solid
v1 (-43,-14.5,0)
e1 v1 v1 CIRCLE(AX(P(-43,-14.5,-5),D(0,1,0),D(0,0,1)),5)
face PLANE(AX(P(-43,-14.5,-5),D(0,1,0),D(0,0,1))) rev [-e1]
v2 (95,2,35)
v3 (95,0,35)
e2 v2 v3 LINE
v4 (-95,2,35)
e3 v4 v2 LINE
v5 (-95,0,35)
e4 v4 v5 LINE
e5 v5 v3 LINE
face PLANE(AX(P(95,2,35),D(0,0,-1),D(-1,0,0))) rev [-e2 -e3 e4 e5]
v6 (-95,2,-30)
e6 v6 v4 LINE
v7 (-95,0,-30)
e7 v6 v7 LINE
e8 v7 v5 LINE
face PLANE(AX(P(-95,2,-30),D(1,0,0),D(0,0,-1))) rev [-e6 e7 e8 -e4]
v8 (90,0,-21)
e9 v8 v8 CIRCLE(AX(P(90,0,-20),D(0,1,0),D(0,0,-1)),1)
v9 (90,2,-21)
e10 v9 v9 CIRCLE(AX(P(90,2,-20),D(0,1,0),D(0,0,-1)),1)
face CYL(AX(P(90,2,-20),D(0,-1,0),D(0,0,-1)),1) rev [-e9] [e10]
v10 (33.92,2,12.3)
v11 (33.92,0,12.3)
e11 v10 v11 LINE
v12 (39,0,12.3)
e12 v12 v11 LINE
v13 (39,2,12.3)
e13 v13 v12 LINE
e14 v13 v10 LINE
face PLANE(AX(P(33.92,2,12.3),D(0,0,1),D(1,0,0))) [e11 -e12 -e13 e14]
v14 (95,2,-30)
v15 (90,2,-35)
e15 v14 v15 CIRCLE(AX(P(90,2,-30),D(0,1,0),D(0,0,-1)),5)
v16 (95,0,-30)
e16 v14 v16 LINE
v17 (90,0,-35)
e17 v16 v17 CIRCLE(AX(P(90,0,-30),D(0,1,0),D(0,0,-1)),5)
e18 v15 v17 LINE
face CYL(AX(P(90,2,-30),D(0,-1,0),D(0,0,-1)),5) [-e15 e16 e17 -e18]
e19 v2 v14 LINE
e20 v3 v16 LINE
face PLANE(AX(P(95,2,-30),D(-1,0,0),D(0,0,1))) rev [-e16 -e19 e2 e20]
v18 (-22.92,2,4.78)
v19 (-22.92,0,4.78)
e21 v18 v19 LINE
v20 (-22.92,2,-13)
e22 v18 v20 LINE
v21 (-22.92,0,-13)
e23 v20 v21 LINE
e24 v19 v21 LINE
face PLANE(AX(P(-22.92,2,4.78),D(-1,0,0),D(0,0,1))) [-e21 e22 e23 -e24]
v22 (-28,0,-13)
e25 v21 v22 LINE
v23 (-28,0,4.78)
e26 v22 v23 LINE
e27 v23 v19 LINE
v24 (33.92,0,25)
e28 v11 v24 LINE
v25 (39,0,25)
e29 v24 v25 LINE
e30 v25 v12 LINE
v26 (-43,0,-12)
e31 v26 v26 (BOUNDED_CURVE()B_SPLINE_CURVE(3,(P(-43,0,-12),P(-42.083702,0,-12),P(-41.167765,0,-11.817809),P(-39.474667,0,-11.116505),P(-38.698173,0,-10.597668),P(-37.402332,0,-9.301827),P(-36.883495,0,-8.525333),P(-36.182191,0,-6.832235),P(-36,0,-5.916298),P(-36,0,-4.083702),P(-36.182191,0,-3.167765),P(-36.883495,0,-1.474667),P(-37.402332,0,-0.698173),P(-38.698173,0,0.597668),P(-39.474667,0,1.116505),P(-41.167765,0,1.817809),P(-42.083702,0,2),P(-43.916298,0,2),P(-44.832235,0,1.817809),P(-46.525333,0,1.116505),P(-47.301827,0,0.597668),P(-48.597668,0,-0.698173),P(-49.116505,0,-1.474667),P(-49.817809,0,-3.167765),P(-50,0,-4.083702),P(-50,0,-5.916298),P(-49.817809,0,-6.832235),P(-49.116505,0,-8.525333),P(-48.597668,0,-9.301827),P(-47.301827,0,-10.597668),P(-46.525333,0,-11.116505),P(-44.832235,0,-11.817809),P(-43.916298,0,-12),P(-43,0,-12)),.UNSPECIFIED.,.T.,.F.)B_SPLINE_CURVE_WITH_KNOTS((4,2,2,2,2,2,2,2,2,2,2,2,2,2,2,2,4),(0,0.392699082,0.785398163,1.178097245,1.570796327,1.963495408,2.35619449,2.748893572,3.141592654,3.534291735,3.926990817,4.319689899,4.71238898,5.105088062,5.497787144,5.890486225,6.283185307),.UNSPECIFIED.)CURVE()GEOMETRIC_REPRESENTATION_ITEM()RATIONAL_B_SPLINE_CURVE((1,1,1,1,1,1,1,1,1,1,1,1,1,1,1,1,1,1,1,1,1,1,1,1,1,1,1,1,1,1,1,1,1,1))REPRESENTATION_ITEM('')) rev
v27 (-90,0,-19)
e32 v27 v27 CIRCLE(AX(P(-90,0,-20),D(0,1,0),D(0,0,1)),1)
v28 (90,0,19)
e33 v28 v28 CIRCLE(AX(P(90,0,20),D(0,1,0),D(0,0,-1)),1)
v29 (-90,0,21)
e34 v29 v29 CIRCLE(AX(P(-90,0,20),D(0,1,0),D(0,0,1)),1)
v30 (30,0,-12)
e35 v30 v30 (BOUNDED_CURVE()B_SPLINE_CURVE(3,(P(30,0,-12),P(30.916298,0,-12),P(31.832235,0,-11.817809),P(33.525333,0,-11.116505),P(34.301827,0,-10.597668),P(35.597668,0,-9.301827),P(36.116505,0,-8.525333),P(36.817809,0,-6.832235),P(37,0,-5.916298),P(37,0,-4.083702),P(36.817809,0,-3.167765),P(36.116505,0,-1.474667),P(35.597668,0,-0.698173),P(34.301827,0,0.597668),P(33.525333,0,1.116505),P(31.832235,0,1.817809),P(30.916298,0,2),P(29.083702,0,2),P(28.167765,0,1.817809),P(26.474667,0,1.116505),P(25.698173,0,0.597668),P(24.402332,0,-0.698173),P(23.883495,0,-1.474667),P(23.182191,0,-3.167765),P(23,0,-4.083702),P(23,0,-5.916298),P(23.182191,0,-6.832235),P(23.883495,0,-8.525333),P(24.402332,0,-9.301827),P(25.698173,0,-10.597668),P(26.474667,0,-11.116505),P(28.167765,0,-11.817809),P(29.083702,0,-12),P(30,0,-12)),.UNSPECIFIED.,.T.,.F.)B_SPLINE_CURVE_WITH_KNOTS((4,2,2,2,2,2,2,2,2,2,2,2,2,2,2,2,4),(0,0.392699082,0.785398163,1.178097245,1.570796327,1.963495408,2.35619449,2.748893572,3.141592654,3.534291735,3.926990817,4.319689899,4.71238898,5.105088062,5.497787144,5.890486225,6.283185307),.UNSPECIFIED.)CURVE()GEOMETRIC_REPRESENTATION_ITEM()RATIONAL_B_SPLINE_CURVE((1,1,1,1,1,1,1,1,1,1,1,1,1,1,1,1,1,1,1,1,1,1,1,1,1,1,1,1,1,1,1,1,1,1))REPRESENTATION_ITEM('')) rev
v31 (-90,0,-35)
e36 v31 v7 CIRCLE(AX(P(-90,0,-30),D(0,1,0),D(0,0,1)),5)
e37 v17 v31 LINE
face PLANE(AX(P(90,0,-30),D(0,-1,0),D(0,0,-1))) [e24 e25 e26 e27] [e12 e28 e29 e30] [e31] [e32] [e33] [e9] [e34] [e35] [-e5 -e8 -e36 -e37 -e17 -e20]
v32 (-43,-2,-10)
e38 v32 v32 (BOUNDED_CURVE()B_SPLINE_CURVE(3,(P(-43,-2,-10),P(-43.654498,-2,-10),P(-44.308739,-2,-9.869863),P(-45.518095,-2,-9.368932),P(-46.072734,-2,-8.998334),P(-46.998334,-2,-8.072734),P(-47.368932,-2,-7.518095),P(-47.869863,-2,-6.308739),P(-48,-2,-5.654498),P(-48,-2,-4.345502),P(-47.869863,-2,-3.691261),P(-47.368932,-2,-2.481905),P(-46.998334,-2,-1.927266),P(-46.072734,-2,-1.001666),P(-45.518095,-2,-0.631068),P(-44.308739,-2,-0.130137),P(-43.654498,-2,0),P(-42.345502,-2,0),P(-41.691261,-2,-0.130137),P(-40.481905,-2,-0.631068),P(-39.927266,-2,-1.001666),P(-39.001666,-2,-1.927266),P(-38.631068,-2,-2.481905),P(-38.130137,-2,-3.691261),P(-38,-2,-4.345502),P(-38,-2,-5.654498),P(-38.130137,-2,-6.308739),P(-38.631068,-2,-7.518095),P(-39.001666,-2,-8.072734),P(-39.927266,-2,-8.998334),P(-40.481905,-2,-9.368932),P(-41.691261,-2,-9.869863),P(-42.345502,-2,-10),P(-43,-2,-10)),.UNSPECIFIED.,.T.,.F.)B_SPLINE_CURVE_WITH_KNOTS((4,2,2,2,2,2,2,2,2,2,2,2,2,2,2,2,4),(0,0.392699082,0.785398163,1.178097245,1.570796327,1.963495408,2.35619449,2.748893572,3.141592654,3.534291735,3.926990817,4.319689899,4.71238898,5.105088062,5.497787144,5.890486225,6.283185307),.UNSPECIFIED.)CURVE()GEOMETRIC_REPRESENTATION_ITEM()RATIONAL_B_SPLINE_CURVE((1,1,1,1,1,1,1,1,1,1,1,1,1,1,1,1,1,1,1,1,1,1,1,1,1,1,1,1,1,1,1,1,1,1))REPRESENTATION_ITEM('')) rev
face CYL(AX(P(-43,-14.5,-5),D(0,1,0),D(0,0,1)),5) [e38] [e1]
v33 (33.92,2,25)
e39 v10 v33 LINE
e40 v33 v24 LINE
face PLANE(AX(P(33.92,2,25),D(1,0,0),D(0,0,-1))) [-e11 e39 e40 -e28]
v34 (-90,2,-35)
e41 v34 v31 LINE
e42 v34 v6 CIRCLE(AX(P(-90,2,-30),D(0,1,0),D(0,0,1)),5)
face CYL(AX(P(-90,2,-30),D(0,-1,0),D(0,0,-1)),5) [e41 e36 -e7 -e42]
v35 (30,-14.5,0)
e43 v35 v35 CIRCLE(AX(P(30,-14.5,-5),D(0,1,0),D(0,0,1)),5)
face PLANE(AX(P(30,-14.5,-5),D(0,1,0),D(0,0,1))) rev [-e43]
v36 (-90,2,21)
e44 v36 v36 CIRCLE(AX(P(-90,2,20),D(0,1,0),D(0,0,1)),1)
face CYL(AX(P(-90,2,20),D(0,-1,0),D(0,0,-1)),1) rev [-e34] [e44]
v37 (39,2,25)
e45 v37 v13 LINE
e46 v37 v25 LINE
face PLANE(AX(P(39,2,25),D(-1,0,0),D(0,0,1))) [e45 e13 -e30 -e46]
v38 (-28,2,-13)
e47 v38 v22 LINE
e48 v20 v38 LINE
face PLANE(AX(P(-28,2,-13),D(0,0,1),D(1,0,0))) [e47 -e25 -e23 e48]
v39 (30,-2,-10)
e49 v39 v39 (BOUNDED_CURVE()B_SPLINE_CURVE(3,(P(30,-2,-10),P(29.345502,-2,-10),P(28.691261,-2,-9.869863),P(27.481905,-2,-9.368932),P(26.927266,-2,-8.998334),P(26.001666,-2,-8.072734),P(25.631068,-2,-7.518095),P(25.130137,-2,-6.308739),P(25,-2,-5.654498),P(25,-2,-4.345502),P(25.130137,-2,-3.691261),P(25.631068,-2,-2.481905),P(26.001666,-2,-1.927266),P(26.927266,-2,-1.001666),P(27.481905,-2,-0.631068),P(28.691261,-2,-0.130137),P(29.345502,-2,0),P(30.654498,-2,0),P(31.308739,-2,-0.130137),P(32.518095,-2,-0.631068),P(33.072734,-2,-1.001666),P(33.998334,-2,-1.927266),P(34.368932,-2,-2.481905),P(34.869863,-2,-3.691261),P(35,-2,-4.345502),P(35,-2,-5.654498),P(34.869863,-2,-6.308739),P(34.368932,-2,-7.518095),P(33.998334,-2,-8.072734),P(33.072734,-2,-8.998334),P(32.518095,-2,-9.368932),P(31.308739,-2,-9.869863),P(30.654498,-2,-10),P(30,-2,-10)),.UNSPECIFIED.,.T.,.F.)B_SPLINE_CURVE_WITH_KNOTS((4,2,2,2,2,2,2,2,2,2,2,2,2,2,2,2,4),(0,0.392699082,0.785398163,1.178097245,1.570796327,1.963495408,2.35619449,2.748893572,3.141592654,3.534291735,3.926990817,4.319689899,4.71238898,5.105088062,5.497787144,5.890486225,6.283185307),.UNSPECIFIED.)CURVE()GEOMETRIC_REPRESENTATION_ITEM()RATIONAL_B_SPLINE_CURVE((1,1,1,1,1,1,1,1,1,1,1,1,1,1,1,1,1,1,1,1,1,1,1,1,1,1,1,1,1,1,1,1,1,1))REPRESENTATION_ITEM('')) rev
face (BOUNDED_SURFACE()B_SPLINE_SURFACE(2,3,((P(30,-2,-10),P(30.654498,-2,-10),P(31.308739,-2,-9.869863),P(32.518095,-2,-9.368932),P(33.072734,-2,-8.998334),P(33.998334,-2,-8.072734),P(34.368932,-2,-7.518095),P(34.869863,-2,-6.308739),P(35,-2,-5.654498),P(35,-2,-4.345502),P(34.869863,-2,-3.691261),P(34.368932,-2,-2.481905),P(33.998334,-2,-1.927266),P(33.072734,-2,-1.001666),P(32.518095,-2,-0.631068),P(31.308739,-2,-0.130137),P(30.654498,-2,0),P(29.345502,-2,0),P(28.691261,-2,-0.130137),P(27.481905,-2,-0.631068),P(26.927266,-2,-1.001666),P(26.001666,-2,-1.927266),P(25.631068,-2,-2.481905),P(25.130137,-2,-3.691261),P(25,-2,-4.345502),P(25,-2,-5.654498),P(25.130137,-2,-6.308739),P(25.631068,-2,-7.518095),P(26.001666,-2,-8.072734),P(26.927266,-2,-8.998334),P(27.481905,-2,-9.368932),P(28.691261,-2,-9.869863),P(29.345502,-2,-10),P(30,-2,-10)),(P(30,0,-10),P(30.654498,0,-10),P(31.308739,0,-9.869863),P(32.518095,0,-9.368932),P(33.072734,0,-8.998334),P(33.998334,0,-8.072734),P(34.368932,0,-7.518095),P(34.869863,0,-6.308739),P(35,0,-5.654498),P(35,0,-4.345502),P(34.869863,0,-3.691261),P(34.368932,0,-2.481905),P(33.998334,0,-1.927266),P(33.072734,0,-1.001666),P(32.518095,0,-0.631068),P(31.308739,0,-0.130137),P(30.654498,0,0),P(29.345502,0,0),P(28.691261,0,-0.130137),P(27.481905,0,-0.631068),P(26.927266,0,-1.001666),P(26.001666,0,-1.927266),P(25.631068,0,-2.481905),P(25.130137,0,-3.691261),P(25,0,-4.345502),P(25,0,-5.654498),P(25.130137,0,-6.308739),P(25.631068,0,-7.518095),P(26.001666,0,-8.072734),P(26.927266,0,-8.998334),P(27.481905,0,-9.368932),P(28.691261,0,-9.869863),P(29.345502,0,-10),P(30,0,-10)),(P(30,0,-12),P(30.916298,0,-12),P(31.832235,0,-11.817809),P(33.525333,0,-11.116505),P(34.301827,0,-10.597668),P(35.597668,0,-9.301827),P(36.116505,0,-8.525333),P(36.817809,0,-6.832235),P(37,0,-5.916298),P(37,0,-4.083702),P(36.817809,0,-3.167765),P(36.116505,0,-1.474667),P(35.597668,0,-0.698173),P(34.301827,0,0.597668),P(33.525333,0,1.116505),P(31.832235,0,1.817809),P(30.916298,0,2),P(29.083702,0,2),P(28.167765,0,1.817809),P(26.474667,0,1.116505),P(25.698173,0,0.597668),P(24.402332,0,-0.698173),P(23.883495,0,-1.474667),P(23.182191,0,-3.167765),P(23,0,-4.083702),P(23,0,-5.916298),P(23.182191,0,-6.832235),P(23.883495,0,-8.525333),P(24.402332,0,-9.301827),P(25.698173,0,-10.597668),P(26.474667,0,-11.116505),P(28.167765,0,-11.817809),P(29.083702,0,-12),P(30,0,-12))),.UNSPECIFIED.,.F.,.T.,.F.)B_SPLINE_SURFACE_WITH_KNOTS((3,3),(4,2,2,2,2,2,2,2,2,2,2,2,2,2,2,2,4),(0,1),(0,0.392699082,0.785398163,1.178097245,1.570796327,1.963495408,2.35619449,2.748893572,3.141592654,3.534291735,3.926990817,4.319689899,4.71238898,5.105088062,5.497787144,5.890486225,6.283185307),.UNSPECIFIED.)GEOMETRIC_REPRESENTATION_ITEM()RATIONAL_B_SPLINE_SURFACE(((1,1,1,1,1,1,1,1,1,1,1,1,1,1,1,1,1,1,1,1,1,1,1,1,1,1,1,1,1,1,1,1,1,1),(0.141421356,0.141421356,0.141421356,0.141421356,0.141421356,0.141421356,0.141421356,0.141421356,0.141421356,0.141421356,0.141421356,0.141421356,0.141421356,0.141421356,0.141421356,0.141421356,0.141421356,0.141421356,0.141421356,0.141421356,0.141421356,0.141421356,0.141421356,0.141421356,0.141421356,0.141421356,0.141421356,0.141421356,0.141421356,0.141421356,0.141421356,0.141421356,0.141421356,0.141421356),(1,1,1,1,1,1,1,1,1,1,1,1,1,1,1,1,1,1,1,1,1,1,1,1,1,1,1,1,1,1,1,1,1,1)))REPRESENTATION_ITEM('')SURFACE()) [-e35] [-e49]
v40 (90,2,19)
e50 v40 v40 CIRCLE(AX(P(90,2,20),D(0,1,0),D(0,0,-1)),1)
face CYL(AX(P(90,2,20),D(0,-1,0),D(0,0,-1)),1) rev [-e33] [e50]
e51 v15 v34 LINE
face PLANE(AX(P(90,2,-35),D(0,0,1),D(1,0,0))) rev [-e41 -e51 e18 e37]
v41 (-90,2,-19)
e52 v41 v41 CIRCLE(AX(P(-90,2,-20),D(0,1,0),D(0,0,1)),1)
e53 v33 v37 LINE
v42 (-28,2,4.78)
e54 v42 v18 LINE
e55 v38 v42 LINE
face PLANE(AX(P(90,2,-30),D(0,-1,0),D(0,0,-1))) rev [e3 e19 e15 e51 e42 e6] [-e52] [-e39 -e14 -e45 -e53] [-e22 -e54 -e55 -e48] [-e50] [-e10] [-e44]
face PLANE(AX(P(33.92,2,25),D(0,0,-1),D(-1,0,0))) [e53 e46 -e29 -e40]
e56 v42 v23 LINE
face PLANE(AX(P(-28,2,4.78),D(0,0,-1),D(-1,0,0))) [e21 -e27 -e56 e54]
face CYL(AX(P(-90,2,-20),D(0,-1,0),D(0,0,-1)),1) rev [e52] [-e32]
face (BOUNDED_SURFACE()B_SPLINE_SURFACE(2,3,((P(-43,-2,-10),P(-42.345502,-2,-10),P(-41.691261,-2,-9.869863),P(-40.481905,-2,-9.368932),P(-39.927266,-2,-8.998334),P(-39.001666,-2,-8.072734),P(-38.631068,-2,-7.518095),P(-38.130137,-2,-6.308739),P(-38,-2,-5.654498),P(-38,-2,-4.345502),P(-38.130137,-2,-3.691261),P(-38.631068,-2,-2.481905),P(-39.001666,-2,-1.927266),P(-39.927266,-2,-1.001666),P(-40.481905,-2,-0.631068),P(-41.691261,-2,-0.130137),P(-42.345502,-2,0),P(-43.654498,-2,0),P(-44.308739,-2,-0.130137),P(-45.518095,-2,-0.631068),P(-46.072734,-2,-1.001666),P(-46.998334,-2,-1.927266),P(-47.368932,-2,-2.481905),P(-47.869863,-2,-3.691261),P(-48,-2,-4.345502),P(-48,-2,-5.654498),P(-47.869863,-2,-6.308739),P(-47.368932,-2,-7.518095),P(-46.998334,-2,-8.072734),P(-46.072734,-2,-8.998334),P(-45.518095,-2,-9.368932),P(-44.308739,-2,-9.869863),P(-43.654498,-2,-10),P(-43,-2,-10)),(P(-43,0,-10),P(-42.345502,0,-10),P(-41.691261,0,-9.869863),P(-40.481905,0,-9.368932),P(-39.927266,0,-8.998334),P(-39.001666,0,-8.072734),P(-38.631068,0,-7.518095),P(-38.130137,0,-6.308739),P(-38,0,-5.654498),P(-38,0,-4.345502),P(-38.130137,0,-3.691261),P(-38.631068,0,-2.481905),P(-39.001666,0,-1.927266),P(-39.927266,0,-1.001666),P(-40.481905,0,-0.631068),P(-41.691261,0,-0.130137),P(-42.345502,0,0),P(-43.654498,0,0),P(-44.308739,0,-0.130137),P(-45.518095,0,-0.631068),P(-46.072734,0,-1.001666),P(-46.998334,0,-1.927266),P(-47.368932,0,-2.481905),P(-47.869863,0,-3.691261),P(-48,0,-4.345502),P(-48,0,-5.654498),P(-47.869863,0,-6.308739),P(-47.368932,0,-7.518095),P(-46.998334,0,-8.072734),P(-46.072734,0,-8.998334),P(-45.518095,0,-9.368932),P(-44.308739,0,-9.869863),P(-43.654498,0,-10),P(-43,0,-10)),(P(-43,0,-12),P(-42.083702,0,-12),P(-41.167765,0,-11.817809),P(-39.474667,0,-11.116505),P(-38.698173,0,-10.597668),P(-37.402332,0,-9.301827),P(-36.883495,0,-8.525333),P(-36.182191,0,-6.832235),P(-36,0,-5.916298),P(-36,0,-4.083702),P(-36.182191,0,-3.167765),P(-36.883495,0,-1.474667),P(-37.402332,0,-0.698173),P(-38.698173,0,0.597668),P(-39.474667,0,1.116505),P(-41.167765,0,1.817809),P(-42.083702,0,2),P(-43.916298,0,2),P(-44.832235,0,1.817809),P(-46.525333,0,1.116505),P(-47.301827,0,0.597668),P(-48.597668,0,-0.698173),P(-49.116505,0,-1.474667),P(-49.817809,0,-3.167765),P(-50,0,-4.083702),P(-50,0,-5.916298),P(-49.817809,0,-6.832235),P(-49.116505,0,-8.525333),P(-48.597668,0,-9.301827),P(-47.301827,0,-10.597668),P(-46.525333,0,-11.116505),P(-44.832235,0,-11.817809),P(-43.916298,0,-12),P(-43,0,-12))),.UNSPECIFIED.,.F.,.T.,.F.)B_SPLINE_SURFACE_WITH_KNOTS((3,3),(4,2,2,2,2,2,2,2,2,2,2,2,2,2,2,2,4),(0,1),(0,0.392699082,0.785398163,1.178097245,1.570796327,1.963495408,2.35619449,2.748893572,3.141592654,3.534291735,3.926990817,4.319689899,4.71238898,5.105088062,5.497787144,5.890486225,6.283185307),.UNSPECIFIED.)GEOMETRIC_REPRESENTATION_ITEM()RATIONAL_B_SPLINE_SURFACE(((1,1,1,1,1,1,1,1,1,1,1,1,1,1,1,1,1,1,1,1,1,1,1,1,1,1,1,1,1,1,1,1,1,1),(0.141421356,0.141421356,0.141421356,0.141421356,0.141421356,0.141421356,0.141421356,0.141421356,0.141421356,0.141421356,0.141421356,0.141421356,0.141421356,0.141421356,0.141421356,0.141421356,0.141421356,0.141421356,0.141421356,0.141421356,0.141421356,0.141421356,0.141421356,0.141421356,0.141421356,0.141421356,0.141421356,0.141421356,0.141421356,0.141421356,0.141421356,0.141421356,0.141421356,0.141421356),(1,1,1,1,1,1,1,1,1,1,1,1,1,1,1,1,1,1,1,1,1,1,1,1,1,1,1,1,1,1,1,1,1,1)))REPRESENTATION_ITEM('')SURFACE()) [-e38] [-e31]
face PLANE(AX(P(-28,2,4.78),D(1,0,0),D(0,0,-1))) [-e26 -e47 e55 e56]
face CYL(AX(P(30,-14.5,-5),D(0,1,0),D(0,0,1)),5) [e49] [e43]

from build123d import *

# Parameters (mm, degrees)
SKETCH_1_R        = 1
SKETCH_1_W        = 5.08
SKETCH_1_H        = 12.7
SKETCH_1_H_2      = 17.78
EXTRUDE_583_DEPTH = 2
SKETCH_2_R        = 5
EXTRUDE_781_DEPTH = 14.5
FILLET_1_SIZE     = 2


with BuildPart() as part:
    # Эскиз1 → Extrude 583 (new body)
    with BuildSketch(Plane(origin=(0, 0, 0), x_dir=(1, 0, 0), z_dir=(0, 1, 0))):
        with BuildLine():
            Line((90, 35), (-90, 35))
            ThreePointArc((-90, 35), (-93.535533906, 33.535533906), (-95, 30))
            Line((-95, 30), (-95, -35))
            Line((-95, -35), (95, -35))
            Line((95, -35), (95, 30))
            ThreePointArc((95, 30), (93.535533906, 33.535533906), (90, 35))
        make_face()
        with Locations(Location((-90, 20, 0), (0, 0, 270))):
            Circle(SKETCH_1_R, mode=Mode.SUBTRACT)
        with Locations(Location((-90, -20, 0), (0, 0, 270))):
            Circle(SKETCH_1_R, mode=Mode.SUBTRACT)
        with Locations(Location((90, -20, 0), (0, 0, 90))):
            Circle(SKETCH_1_R, mode=Mode.SUBTRACT)
        with Locations(Location((90, 20, 0), (0, 0, 90))):
            Circle(SKETCH_1_R, mode=Mode.SUBTRACT)
        with Locations((36.46, -18.65)):
            Rectangle(SKETCH_1_W, SKETCH_1_H, mode=Mode.SUBTRACT)
        with Locations((-25.46, 4.11)):
            Rectangle(SKETCH_1_W, SKETCH_1_H_2, mode=Mode.SUBTRACT)
    extrude(amount=EXTRUDE_583_DEPTH)

    # Эскиз2 → Extrude 781 (add)
    with BuildSketch(Plane(origin=(0, 0, 0), x_dir=(1, 0, 0), z_dir=(0, 1, 0))):
        with Locations(Location((30, 5, 0), (0, 0, 270))):
            Circle(SKETCH_2_R)
        with Locations(Location((-43, 5, 0), (0, 0, 270))):
            Circle(SKETCH_2_R)
    extrude(amount=-EXTRUDE_781_DEPTH)

    # Скругление1
    # a fillet whose section is not a circle: 2 mm, written as the material it adds along each edge
    with BuildSketch(Plane(origin=(30, 0, -5), x_dir=(0, 0, 1), z_dir=(-1, 0, 0))) as fillet_1_piece_1:
        with BuildLine():
            Bezier((5 + FILLET_1_SIZE, 0), (5, 0), (5, -FILLET_1_SIZE), weights=[1, 0.141421356, 1])
            Line((5, -FILLET_1_SIZE), (5, 0))
            Line((5, 0), (5 + FILLET_1_SIZE, 0))
        make_face()
    revolve(axis=Axis((30, 0, -5), (0, 1, 0)))
    with BuildSketch(Plane(origin=(-43, 0, -5), x_dir=(0, 0, 1), z_dir=(-1, 0, 0))) as fillet_1_piece_2:
        with BuildLine():
            Bezier((5 + FILLET_1_SIZE, 0), (5, 0), (5, -FILLET_1_SIZE), weights=[1, 0.141421356, 1])
            Line((5, -FILLET_1_SIZE), (5, 0))
            Line((5, 0), (5 + FILLET_1_SIZE, 0))
        make_face()
    revolve(axis=Axis((-43, 0, -5), (0, 1, 0)))


solid = part.part
